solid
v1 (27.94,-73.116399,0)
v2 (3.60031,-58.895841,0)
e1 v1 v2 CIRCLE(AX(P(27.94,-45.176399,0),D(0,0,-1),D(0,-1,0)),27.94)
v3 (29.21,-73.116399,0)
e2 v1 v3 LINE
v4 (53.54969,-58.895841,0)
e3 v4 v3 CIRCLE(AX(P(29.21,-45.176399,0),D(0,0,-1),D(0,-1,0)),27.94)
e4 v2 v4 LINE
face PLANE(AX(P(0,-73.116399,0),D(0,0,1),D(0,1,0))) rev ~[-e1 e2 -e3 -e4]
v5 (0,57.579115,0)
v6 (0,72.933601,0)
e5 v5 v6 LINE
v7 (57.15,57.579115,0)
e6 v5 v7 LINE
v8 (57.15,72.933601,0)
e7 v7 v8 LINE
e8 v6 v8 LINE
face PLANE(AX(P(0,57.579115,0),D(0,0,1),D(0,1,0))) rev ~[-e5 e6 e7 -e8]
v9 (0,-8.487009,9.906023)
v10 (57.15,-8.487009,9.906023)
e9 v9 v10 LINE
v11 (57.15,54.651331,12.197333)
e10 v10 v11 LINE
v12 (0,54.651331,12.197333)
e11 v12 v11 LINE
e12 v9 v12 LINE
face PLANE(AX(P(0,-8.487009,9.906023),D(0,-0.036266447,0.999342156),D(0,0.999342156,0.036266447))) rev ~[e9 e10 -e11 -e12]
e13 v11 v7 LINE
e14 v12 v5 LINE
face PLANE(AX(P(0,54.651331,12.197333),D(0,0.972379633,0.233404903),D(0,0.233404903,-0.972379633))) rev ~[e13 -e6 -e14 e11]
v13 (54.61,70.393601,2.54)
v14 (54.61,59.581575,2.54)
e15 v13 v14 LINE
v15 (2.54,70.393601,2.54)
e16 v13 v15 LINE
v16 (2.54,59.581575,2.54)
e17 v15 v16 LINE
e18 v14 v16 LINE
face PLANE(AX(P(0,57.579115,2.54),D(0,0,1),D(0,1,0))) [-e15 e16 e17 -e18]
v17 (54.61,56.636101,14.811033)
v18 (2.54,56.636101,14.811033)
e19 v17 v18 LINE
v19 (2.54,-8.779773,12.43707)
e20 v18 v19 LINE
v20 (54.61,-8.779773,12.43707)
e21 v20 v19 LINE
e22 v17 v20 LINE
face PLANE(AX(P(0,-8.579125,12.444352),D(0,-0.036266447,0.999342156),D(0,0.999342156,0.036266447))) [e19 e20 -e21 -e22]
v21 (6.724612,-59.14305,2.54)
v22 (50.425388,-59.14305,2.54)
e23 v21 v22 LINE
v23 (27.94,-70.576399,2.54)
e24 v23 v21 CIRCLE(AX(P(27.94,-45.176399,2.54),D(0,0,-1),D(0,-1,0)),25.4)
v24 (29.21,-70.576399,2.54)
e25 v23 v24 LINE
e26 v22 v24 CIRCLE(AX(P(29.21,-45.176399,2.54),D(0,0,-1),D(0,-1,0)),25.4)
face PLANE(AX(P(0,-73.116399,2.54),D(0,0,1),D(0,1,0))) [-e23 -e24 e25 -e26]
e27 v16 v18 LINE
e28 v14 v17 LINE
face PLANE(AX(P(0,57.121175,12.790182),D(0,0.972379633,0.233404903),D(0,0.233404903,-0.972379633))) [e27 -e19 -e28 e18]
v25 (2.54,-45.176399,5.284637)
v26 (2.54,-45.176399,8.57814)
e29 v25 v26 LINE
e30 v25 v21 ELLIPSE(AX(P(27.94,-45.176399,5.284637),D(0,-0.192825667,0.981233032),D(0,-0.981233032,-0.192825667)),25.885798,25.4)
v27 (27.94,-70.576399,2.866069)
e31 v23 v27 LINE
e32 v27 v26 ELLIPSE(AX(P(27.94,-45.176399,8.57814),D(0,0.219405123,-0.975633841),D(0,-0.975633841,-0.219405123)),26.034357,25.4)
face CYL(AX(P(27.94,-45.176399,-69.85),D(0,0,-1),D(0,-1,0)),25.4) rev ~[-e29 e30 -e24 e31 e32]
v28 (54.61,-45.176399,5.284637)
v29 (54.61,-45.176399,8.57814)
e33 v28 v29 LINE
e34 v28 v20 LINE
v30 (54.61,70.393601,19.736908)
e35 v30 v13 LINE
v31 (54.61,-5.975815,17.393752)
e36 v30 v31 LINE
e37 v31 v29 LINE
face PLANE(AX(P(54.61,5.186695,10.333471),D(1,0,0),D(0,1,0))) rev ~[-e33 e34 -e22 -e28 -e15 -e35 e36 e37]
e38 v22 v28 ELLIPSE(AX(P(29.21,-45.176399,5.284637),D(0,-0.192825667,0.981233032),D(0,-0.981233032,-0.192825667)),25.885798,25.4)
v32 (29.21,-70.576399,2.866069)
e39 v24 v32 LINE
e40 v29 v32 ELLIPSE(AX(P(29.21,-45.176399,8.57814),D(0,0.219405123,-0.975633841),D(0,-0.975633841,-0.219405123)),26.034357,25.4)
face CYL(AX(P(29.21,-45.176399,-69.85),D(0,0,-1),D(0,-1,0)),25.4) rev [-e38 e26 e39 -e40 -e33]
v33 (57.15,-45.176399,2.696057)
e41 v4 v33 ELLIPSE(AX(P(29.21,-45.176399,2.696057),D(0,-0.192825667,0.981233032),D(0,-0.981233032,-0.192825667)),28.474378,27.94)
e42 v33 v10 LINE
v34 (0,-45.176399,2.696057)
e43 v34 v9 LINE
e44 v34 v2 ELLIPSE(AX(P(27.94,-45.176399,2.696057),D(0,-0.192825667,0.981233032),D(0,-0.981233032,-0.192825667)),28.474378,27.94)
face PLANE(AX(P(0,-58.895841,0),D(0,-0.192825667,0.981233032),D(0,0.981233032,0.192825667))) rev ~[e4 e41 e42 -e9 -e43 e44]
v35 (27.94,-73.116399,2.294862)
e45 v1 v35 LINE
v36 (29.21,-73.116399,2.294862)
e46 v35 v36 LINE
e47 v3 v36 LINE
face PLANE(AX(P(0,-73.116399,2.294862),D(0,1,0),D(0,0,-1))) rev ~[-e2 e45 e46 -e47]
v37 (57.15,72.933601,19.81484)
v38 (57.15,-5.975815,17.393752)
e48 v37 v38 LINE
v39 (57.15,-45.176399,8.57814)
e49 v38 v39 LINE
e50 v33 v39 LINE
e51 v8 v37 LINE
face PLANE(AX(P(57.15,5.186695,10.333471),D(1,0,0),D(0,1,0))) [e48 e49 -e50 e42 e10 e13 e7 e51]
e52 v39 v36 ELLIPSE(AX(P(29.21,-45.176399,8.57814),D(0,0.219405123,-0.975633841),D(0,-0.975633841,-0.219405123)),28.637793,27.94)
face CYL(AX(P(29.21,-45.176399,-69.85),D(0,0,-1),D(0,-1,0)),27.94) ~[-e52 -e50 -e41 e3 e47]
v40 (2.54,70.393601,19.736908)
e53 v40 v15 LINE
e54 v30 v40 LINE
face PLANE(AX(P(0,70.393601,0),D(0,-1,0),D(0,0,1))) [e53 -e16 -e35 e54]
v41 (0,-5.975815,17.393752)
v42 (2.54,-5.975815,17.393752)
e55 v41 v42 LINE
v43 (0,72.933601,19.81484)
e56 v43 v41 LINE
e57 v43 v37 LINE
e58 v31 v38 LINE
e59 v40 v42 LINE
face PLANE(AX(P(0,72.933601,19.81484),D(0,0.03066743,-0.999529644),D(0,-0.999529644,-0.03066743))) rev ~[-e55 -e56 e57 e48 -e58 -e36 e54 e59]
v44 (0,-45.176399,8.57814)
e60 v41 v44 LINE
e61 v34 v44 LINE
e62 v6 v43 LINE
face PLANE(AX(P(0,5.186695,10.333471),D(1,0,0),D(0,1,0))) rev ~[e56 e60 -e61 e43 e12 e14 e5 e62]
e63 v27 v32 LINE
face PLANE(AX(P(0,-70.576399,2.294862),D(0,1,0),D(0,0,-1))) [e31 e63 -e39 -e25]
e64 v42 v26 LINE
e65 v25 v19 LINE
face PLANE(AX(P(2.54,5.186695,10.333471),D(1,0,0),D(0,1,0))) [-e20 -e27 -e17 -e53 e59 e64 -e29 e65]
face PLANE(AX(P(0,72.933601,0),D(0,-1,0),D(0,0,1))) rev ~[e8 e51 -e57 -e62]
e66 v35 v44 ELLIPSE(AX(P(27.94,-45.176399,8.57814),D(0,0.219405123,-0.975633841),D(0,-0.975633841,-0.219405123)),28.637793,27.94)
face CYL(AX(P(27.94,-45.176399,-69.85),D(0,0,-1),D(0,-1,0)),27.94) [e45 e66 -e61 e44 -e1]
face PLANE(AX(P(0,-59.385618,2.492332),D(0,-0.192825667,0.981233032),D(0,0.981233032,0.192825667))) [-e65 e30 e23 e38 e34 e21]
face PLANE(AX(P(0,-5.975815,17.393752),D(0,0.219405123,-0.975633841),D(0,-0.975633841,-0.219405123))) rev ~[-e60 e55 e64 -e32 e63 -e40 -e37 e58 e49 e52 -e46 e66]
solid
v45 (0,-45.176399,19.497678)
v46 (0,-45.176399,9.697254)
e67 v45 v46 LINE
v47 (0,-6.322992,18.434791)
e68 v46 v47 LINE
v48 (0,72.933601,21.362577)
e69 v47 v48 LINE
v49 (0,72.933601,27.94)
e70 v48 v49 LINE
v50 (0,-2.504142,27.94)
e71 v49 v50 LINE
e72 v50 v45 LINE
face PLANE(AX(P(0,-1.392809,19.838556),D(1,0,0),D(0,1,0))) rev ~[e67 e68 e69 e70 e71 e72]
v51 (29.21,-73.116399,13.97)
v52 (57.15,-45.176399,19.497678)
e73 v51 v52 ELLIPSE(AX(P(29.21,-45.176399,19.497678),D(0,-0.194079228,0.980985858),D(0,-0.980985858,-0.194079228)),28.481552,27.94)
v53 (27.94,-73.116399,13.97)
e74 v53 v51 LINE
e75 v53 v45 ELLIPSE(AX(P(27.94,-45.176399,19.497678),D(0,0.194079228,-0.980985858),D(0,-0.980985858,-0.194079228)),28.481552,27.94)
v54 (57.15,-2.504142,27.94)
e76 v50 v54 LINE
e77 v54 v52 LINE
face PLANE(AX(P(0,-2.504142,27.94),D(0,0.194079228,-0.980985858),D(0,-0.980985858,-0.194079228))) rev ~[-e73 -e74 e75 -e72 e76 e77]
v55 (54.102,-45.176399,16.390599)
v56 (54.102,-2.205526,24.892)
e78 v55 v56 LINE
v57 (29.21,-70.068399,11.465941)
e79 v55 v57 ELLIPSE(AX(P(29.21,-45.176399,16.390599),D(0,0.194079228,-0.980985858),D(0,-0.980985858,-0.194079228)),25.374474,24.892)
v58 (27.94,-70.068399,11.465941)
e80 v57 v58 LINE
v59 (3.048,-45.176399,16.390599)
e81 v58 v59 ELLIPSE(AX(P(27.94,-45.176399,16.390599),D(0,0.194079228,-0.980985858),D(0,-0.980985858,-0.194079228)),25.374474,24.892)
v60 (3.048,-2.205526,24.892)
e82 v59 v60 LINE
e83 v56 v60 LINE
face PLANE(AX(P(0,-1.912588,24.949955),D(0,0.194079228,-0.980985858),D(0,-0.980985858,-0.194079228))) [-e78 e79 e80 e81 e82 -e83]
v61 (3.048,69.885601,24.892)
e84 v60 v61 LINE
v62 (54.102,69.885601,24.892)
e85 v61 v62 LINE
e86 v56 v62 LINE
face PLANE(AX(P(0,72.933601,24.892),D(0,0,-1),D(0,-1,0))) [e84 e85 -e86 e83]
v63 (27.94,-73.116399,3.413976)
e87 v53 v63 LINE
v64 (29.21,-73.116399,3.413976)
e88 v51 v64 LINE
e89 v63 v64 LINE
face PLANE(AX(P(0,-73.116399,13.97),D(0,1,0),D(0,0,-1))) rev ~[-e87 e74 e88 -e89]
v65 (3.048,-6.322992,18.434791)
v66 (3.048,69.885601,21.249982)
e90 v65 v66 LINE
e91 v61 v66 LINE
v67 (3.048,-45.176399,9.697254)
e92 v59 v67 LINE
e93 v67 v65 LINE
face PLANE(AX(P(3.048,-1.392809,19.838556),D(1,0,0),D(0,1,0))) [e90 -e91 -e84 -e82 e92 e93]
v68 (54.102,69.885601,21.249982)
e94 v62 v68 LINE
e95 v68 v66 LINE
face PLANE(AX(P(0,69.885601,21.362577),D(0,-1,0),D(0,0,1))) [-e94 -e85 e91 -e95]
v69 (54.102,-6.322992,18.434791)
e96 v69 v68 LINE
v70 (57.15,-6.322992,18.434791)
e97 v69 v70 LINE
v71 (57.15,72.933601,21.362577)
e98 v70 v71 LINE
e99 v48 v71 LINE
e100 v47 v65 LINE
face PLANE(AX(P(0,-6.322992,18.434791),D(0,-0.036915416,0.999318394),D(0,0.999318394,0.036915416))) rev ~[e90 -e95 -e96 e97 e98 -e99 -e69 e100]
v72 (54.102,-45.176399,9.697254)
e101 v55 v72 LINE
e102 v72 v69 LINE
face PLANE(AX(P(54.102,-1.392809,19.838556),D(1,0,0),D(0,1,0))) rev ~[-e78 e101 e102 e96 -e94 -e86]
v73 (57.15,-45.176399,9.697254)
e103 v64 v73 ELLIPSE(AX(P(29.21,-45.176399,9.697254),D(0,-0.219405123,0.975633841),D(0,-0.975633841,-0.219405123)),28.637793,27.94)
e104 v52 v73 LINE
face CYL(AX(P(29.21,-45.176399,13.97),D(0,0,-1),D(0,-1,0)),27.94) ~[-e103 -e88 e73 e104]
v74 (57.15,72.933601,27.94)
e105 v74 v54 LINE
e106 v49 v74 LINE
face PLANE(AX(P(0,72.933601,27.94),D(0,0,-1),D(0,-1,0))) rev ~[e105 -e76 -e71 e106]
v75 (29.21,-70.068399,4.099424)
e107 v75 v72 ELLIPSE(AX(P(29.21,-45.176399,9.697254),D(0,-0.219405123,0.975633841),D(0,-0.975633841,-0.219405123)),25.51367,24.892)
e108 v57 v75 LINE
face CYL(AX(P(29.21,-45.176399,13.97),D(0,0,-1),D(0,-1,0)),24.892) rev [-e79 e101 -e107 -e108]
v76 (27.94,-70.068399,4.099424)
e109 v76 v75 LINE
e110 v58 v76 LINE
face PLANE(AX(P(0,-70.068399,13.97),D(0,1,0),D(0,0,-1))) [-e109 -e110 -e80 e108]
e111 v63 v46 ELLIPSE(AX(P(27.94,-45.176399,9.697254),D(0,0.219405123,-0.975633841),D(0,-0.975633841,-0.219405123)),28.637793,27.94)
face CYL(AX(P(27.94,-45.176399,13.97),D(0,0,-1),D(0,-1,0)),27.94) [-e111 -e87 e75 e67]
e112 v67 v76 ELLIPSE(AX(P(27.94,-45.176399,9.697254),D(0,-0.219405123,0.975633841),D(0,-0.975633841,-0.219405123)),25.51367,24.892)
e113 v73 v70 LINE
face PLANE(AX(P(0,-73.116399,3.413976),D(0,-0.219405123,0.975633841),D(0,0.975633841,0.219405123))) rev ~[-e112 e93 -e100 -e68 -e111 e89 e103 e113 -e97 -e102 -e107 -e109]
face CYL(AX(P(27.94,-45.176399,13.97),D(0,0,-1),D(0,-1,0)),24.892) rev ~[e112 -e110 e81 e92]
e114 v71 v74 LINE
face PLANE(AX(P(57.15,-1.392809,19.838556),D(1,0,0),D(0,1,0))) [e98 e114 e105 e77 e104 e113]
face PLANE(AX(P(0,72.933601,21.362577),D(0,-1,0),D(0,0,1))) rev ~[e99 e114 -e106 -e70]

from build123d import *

# Parameters (mm, degrees)
F1_DEPTH    = 57.15
F2_R        = 27.94
F3_T        = -3.048
F4_DEPTH    = 57.15
F5_T1_DEPTH = 141.9948617116
F6_T        = -2.54


# Not quite as in the source:
# - a fillet or chamfer that OpenCascade refuses, or shapes differently, is made with other operations: its cross-section is extruded or revolved along the edge and cut away or added


with BuildPart() as f1:
    # F0 (on Right) → F1 (new body)
    with BuildSketch(Plane.YZ):
        Polygon((-73.1163992389, 13.97), (-73.1163992389, 3.4139757045), (-6.3229924999, 18.4347908944), (72.9336007611, 21.3625766337), (72.9336007611, 27.94), (-2.5041415356, 27.94), align=None)
    extrude(amount=F1_DEPTH)

    # F2
    f2_edges = [f1.edges().sort_by_distance(p)[0] for p in [
        (0, -73.116399, 8.691988),
        (57.15, -73.116399, 8.691988),
    ]]
    fillet(f2_edges, radius=F2_R)

    # F3
    f3_openings = [f1.faces().sort_by_distance(p)[0] for p in [
        (28.575, 33.305304, 19.898684),
        (28.575, -37.106773, 11.51199),
    ]]
    offset(amount=F3_T, openings=f3_openings)


with BuildPart() as f4:
    # F0 (on Right) → F4 (new body)
    with BuildSketch(Plane.YZ):
        Polygon((-73.1163992389, 2.2948617116), (-73.1163992389, 0), (-58.8958412409, 0), (-8.487008512, 9.9060228094), (54.6513311565, 12.197333388), (57.5791150331, 0), (72.9336007611, 0), (72.9336007611, 19.8148395866), (-5.9758147364, 17.3937518685), align=None)
    extrude(amount=F4_DEPTH)

    # F5: fillet of radius 27.94 on 2 edges, made by hand

    # F5_s2 → F5_t1 (cut)
    with BuildSketch(Plane.XY.offset(-69.85)):
        with BuildLine():
            ThreePointArc((29.21, -73.1163992389), (48.9665634664, -64.9329627053), (57.15, -45.1763992389))
            Line((57.15, -45.1763992389), (57.15, -73.1163992389))
            Line((57.15, -73.1163992389), (29.21, -73.1163992389))
        make_face()
        with BuildLine():
            ThreePointArc((27.94, -73.1163992389), (8.1834365336, -64.9329627053), (0, -45.1763992389))
            Line((0, -45.1763992389), (0, -73.1163992389))
            Line((0, -73.1163992389), (27.94, -73.1163992389))
        make_face()
    extrude(amount=F5_T1_DEPTH, mode=Mode.SUBTRACT)

    # F6
    f6_openings = [f4.faces().sort_by_distance(p)[0] for p in [
        (28.575, -36.93138, 10.432319),
        (28.575, 33.478893, 18.604296),
    ]]
    offset(amount=F6_T, openings=f6_openings, kind=Kind.INTERSECTION)


solid = Compound([f1.part, f4.part])
